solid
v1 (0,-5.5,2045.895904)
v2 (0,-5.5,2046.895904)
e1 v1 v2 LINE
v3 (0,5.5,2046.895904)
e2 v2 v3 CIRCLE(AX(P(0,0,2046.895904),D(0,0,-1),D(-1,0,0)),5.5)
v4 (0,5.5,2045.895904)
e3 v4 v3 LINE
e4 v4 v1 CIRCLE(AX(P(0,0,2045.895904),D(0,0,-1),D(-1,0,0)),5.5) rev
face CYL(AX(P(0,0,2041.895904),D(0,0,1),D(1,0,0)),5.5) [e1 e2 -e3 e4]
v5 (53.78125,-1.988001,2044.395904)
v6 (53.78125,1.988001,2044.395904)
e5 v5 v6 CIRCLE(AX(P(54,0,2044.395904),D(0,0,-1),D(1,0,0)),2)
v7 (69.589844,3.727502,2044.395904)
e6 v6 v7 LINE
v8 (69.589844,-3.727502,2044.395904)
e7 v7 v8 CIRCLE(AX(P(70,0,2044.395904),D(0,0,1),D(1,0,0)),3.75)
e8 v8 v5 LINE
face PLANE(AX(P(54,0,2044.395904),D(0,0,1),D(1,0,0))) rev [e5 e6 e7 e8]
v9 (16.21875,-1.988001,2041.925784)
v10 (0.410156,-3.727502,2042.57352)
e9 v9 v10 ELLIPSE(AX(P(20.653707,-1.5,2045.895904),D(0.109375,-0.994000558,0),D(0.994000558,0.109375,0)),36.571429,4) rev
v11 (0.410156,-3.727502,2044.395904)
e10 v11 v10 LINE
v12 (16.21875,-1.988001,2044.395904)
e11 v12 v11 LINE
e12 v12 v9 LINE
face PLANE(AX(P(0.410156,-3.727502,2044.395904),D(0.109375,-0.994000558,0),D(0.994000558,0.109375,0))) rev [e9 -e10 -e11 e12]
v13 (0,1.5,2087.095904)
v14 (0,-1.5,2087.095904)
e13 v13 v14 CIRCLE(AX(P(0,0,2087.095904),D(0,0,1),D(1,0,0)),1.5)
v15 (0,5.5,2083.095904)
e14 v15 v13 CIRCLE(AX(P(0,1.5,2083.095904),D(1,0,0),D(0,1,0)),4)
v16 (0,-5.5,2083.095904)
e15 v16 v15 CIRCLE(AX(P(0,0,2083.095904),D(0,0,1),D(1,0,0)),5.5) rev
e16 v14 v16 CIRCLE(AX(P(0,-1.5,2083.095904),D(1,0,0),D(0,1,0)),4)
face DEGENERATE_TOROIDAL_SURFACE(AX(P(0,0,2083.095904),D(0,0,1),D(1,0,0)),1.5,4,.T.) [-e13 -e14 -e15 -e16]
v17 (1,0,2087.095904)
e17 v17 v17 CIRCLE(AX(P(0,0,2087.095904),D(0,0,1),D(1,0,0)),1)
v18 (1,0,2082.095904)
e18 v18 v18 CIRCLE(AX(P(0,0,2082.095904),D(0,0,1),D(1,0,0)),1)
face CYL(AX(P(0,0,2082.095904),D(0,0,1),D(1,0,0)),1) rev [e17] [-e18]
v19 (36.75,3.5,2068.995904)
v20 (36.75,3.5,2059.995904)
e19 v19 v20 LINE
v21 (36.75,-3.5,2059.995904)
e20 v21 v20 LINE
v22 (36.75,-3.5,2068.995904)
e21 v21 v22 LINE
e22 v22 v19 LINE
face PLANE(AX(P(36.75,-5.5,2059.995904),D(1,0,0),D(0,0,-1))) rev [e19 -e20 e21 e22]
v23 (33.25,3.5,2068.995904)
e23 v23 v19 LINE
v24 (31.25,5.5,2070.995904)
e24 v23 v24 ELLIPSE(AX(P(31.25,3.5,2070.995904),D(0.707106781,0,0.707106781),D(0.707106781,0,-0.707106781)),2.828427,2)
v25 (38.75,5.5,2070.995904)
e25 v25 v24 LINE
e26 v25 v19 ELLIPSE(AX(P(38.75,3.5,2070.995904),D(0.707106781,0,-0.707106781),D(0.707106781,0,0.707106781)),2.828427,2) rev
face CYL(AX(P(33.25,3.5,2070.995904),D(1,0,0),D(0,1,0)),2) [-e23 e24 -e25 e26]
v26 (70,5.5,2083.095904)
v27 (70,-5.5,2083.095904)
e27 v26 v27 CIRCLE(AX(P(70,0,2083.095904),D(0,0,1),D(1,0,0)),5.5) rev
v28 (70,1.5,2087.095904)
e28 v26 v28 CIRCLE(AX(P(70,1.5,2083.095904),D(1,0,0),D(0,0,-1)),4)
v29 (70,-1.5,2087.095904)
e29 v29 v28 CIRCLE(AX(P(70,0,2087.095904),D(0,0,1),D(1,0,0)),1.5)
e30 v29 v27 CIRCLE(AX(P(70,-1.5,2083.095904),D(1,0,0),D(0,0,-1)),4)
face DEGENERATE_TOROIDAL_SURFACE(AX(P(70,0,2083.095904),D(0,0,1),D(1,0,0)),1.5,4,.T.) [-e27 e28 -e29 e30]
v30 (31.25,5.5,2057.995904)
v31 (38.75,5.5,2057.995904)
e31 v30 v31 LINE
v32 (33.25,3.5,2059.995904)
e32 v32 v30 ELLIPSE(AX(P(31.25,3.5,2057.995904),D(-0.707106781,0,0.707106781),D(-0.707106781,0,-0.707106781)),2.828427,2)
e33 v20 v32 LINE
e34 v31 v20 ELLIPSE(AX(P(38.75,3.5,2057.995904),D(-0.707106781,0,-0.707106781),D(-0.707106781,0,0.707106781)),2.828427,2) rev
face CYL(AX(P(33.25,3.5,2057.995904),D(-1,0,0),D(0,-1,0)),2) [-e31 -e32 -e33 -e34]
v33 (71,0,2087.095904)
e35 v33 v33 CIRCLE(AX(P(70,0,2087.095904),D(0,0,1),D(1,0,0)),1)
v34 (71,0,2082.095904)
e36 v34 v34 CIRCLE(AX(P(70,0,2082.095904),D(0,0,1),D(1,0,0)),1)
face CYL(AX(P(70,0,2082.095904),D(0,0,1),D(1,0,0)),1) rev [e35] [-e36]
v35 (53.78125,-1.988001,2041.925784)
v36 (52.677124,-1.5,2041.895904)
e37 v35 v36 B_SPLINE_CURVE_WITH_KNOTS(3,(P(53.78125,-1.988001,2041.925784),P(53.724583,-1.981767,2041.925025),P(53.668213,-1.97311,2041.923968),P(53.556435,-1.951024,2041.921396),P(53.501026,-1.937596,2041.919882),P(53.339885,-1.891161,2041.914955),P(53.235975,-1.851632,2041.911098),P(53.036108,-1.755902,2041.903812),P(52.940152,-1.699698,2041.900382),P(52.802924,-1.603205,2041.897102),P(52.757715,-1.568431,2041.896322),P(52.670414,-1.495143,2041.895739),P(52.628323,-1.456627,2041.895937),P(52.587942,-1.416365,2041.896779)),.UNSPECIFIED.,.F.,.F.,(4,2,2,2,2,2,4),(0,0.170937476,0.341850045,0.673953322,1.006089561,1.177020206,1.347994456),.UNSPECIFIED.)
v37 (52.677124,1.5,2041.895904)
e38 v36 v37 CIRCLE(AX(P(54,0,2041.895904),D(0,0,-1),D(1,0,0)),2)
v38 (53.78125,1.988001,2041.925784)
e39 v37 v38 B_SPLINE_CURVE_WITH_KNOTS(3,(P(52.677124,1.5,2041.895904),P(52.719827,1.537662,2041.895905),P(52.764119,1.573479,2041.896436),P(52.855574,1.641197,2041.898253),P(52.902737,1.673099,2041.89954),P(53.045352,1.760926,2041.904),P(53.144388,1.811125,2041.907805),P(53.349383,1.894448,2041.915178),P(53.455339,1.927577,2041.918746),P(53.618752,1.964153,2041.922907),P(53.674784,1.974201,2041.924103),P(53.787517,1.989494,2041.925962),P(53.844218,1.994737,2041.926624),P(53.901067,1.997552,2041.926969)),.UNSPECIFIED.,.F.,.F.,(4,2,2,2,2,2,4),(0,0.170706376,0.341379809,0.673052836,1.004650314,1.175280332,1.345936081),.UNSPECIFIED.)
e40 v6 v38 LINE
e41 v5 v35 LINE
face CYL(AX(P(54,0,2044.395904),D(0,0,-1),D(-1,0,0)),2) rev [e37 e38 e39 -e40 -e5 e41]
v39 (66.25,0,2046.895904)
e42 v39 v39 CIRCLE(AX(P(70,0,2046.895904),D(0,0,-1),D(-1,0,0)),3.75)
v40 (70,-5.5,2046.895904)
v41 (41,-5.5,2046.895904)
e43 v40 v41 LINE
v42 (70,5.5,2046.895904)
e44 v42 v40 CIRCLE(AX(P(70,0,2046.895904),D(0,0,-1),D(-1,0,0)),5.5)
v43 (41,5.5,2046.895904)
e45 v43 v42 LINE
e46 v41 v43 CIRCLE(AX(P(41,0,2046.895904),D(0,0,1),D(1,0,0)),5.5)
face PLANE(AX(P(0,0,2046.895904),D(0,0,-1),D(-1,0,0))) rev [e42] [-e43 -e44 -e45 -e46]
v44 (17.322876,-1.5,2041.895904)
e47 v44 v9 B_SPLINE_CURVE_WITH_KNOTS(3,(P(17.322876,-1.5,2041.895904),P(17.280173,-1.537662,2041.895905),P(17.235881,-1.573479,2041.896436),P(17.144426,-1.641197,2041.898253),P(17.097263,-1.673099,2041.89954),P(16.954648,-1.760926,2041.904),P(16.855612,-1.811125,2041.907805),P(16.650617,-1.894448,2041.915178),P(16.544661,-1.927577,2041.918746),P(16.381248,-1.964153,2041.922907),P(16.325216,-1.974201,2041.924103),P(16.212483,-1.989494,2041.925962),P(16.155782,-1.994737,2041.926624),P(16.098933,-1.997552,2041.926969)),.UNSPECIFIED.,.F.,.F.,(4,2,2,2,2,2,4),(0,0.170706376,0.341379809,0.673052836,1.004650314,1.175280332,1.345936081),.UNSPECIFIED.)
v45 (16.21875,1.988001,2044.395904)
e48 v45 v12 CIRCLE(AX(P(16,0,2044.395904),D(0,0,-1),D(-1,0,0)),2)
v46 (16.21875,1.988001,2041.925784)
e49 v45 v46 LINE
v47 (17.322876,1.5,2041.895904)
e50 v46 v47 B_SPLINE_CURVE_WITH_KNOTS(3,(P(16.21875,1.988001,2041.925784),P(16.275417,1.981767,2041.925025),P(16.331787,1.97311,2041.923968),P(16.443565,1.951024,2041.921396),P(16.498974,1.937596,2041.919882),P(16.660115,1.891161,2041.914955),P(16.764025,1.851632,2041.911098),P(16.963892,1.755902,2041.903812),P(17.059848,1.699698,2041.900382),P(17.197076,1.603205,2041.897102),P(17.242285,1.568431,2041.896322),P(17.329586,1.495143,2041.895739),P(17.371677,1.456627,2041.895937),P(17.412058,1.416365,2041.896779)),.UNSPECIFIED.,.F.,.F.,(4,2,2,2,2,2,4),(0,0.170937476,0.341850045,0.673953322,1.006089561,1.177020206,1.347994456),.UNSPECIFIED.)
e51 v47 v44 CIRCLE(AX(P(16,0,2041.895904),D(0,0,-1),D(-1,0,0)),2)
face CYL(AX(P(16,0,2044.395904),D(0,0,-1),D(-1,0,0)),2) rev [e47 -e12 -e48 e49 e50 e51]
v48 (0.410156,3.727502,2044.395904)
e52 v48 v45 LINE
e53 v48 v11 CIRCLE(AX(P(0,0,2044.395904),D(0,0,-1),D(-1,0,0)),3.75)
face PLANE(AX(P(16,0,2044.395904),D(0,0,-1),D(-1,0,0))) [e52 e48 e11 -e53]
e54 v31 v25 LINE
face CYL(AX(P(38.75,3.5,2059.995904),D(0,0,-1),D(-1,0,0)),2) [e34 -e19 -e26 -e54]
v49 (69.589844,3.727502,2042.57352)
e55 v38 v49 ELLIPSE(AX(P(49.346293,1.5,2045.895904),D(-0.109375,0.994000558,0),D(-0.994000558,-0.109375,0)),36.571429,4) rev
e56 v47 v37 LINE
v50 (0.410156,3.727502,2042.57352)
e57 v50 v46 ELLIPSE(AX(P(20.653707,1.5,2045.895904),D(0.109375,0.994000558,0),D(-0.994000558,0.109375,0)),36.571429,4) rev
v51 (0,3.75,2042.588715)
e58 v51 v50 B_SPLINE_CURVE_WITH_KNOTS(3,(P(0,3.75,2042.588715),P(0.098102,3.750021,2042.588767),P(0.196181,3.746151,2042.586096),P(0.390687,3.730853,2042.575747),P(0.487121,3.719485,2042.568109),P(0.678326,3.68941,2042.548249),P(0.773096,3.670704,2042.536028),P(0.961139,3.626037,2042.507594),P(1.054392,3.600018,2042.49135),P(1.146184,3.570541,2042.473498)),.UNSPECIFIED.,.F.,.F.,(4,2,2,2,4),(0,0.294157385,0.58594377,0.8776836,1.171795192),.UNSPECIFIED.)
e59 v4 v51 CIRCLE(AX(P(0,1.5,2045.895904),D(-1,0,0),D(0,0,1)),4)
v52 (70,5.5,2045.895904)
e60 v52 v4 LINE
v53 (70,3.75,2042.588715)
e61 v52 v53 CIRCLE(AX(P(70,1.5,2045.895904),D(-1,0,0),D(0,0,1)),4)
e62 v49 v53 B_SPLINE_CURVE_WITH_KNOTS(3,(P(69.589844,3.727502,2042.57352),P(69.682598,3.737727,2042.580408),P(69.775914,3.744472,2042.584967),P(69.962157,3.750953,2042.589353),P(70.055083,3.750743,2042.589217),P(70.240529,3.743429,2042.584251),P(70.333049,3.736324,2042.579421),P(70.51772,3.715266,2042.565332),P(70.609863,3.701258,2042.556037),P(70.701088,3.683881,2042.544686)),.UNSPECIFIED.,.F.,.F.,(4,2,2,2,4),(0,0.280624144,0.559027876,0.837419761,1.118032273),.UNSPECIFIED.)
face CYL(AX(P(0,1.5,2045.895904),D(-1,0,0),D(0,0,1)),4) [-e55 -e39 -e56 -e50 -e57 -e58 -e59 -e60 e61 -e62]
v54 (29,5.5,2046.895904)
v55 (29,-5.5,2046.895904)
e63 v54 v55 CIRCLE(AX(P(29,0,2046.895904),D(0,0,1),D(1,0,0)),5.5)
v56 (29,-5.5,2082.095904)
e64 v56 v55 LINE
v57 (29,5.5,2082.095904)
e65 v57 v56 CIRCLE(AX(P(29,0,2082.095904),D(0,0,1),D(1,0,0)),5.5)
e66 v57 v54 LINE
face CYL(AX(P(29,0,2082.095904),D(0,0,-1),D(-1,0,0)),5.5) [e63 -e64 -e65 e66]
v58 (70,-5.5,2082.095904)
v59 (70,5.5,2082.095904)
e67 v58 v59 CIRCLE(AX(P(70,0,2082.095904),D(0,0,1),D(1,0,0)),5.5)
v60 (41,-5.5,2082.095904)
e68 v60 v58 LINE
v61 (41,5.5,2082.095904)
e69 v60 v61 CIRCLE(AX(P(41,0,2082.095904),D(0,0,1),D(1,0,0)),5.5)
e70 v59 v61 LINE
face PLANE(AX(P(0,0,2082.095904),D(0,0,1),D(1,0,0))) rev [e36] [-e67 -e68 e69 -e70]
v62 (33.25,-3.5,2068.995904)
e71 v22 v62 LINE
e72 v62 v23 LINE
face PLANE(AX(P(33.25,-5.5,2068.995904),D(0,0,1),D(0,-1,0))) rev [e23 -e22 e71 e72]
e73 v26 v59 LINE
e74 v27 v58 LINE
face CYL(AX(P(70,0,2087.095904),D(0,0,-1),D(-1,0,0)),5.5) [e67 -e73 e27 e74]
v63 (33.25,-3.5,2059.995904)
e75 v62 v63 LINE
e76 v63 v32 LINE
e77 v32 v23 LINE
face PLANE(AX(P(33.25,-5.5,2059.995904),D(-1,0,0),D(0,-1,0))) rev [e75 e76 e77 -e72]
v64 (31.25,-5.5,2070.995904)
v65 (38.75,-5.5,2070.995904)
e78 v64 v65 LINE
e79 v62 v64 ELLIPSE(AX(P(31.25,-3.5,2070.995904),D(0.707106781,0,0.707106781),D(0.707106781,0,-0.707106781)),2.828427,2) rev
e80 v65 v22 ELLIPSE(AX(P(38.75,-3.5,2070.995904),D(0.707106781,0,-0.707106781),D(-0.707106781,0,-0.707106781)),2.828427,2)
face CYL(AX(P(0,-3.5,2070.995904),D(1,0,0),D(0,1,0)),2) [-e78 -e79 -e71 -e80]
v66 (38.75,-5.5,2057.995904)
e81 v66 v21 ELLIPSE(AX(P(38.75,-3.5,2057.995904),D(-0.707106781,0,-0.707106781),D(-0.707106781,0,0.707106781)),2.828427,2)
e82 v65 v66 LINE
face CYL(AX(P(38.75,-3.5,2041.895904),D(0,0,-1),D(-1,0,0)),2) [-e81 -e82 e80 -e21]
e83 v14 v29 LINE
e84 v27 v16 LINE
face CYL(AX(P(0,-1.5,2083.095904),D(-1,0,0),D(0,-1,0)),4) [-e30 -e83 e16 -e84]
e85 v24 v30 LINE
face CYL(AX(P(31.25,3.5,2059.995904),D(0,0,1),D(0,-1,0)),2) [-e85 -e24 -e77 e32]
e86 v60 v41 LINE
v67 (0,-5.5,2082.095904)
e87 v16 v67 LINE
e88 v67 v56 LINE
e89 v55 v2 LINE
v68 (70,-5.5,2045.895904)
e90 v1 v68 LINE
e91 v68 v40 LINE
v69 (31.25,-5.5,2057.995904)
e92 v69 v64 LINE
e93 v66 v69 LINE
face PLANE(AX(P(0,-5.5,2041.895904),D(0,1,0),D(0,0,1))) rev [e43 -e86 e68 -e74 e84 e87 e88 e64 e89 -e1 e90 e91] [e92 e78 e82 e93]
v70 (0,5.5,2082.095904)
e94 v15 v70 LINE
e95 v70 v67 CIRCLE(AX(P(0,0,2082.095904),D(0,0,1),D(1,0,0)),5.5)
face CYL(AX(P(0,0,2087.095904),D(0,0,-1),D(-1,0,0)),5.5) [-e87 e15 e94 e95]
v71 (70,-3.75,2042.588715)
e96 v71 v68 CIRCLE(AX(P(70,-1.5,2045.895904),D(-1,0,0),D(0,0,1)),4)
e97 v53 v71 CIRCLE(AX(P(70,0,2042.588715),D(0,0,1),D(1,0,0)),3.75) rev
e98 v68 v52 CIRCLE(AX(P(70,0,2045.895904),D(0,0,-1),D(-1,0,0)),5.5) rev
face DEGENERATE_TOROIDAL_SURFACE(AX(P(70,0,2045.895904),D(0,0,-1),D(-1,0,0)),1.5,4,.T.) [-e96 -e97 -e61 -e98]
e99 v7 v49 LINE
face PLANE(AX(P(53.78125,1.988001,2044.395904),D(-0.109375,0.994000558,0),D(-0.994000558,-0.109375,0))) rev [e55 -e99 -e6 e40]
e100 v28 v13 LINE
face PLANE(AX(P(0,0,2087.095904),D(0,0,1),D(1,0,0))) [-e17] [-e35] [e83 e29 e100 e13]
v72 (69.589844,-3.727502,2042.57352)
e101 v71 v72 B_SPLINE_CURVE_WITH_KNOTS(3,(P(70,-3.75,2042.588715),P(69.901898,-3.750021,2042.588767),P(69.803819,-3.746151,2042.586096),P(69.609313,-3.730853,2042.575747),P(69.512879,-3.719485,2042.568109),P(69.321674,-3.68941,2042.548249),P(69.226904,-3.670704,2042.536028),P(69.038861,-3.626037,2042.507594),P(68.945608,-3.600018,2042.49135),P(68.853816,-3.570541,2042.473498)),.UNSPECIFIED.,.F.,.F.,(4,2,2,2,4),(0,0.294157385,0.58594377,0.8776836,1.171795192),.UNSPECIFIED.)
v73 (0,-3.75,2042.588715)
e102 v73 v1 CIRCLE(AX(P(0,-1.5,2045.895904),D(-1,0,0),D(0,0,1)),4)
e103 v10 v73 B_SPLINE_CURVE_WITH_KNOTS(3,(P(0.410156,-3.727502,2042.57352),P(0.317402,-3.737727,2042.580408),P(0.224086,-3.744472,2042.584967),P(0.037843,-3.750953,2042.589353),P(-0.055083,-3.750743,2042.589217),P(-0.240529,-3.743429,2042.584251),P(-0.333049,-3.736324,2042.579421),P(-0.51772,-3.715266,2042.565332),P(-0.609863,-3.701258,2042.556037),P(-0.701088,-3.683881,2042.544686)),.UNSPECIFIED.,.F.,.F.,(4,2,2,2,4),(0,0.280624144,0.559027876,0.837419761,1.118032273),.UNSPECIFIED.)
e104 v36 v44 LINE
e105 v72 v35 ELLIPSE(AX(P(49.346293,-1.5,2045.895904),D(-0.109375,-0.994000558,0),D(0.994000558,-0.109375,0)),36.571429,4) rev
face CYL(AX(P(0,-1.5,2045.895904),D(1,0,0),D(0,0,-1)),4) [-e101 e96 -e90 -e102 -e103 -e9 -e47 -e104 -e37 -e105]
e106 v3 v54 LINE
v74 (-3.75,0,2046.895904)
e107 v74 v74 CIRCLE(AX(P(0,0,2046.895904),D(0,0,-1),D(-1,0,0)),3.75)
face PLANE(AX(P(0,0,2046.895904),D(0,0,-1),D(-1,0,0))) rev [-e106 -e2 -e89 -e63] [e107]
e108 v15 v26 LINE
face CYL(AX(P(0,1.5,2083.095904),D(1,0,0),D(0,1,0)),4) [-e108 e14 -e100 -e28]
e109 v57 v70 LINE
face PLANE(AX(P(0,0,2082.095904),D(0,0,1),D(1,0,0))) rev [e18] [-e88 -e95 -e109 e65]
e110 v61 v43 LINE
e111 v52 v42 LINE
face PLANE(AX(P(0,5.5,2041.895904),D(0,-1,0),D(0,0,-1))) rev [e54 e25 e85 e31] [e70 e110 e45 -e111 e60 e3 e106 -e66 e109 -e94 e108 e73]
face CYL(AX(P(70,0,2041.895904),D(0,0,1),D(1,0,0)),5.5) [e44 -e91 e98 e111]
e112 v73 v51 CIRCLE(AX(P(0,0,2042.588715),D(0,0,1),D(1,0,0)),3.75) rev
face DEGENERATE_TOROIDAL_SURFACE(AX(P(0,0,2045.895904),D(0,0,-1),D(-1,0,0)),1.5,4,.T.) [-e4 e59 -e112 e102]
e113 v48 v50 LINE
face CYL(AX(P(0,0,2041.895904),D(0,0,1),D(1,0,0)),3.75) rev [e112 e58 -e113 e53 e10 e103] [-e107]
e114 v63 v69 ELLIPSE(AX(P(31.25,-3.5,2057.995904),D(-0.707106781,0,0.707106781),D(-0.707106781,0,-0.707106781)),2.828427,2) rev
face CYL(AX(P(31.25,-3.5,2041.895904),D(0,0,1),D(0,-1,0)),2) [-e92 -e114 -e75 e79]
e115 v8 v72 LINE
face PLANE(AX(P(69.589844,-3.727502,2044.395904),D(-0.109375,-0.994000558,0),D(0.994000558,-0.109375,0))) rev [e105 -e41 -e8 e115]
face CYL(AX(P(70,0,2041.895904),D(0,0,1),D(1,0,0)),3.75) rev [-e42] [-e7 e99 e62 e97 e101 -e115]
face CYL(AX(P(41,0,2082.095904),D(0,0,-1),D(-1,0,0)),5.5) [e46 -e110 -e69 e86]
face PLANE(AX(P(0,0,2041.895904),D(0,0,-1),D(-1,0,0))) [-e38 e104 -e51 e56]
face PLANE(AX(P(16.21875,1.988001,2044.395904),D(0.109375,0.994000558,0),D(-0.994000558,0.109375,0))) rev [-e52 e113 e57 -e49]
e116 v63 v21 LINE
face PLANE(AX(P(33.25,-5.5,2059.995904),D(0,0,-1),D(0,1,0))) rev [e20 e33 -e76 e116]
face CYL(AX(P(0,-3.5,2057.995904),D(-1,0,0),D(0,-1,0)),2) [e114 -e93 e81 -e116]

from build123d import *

# Parameters (mm, degrees)
BOSS_EXTRU_1_DEPTH      = 1
BOSS_EXTRU_1_DEPTH_BACK = 4
ESQUISSE1_R             = 3.75
ENL_V_MAT_EXTRU_1_DEPTH = 2.5
BOSS_EXTRU_2_DEPTH      = 35.2
BOSS_EXTRU_3_START      = 5
BOSS_EXTRU_3_DEPTH      = 5
ESQUISSE5_R             = 1
ENL_V_MAT_EXTRU_2_DEPTH = 5
CONG_1_R                = 4
ESQUISSE6_W             = 3.5
ESQUISSE6_H             = 9
ENL_V_MAT_EXTRU_3_DEPTH = 2089.490019804
CONG_2_R                = 2


with BuildPart() as part:
    # Esquisse1 → Boss.-Extru.1 (new, two sides: drawn at the far end of the back side and taken through both)
    with BuildSketch(Plane(origin=(0, 0, 2042.895904074), x_dir=(-1, 0, 0), z_dir=(0, 0, -1)).offset(-BOSS_EXTRU_1_DEPTH_BACK)):
        with BuildLine():
            Line((0, -5.5), (-70, -5.5))
            ThreePointArc((-70, -5.5), (-75.5, 0), (-70, 5.5))
            Line((-70, 5.5), (0, 5.5))
            ThreePointArc((0, 5.5), (5.5, 0), (0, -5.5))
        make_face()
        Circle(ESQUISSE1_R, mode=Mode.SUBTRACT)
        with Locations((-70, 0)):
            Circle(ESQUISSE1_R, mode=Mode.SUBTRACT)
    extrude(amount=BOSS_EXTRU_1_DEPTH + BOSS_EXTRU_1_DEPTH_BACK)

    # Esquisse2 → Enlèv. mat.-Extru.1 (cut)
    with BuildSketch(Plane(origin=(0, 0, 2041.895904074), x_dir=(-1, 0, 0), z_dir=(0, 0, -1))):
        with BuildLine():
            Line((-0.41015625, -3.727502093), (-16.21875, -1.988001116))
            ThreePointArc((-16.21875, -1.988001116), (-18, 0), (-16.21875, 1.988001116))
            Line((-16.21875, 1.988001116), (-0.41015625, 3.727502093))
            Line((-0.41015625, 3.727502093), (-0.41015625, -3.727502093))
        make_face()
        with BuildLine():
            Line((-53.78125, 1.988001116), (-69.58984375, 3.727502093))
            Line((-69.58984375, 3.727502093), (-69.58984375, -3.727502093))
            Line((-69.58984375, -3.727502093), (-53.78125, -1.988001116))
            ThreePointArc((-53.78125, -1.988001116), (-52, 0), (-53.78125, 1.988001116))
        make_face()
    extrude(amount=-ENL_V_MAT_EXTRU_1_DEPTH, mode=Mode.SUBTRACT)

    # Esquisse3 → Boss.-Extru.2 (add)
    with BuildSketch(Plane.XY.offset(2046.895904074)):
        with BuildLine():
            Line((29, 5.5), (41, 5.5))
            ThreePointArc((41, 5.5), (46.5, 0), (41, -5.5))
            Line((41, -5.5), (29, -5.5))
            ThreePointArc((29, -5.5), (23.5, 0), (29, 5.5))
        make_face()
    extrude(amount=BOSS_EXTRU_2_DEPTH)

    # Esquisse4 → Boss.-Extru.3 (add)
    with BuildSketch(Plane.XY.offset(2082.095904074).offset(BOSS_EXTRU_3_START)):
        with BuildLine():
            Line((0, 5.5), (70, 5.5))
            ThreePointArc((70, 5.5), (75.5, 0), (70, -5.5))
            Line((70, -5.5), (0, -5.5))
            ThreePointArc((0, -5.5), (-5.5, 0), (0, 5.5))
        make_face()
    extrude(amount=-BOSS_EXTRU_3_DEPTH)

    # Esquisse5 → Enlèv. mat.-Extru.2 (cut)
    with BuildSketch(Plane.XY.offset(2087.095904074)):
        Circle(ESQUISSE5_R)
        with Locations((70, 0)):
            Circle(ESQUISSE5_R)
    extrude(amount=-ENL_V_MAT_EXTRU_2_DEPTH, mode=Mode.SUBTRACT)

    # Congé1
    # the kernel refuses this fillet: 4 mm, written as the material it takes off along each edge
    with BuildSketch(Plane(origin=(70, 5.5, 2041.895904074), x_dir=(0, 0, 1), z_dir=(-1, 0, 0)), Plane(origin=(0, -5.5, 2041.895904074), x_dir=(0, 0, 1), z_dir=(1, 0, 0)), Plane(origin=(70, -5.5, 2087.095904074), x_dir=(0, 0, -1), z_dir=(-1, 0, 0)), Plane(origin=(0, 5.5, 2087.095904074), x_dir=(0, 0, -1), z_dir=(1, 0, 0))) as cong_1_piece_1:
        with BuildLine():
            CenterArc((CONG_1_R, -CONG_1_R), CONG_1_R, 90, 90)
            Line((0, -CONG_1_R), (0, 0))
            Line((0, 0), (CONG_1_R, 0))
        make_face()
    extrude(amount=70, mode=Mode.SUBTRACT)
    with BuildSketch(Plane(origin=(70, 0, 2087.095904074), x_dir=(0, 1, 0), z_dir=(-1, 0, 0))) as cong_1_piece_2:
        with BuildLine():
            CenterArc((5.5 - CONG_1_R, CONG_1_R), CONG_1_R, 270, 90)
            Line((5.5, CONG_1_R), (5.5, 0))
            Line((5.5, 0), (5.5 - CONG_1_R, 0))
        make_face()
    revolve(axis=Axis((70, 0, 2087.095904074), (0, 0, -1)), revolution_arc=180, mode=Mode.SUBTRACT)
    with BuildSketch(Plane(origin=(0, 0, 2087.095904074), x_dir=(0, -1, 0), z_dir=(1, 0, 0))) as cong_1_piece_3:
        with BuildLine():
            CenterArc((5.5 - CONG_1_R, CONG_1_R), CONG_1_R, 270, 90)
            Line((5.5 - CONG_1_R, 0), (5.5, 0))
            Line((5.5, 0), (5.5, CONG_1_R))
        make_face()
    revolve(axis=Axis((0, 0, 2087.095904074), (0, 0, -1)), revolution_arc=180, mode=Mode.SUBTRACT)
    with BuildSketch(Plane(origin=(0, 0, 2041.895904074), x_dir=(0, 1, 0), z_dir=(1, 0, 0))) as cong_1_piece_4:
        with BuildLine():
            CenterArc((5.5 - CONG_1_R, CONG_1_R), CONG_1_R, 270, 90)
            Line((5.5, CONG_1_R), (5.5, 0))
            Line((5.5, 0), (5.5 - CONG_1_R, 0))
        make_face()
    revolve(axis=Axis((0, 0, 2041.895904074), (0, 0, 1)), revolution_arc=180, mode=Mode.SUBTRACT)
    with BuildSketch(Plane(origin=(70, 0, 2041.895904074), x_dir=(0, -1, 0), z_dir=(-1, 0, 0))) as cong_1_piece_5:
        with BuildLine():
            CenterArc((5.5 - CONG_1_R, CONG_1_R), CONG_1_R, 270, 90)
            Line((5.5 - CONG_1_R, 0), (5.5, 0))
            Line((5.5, 0), (5.5, CONG_1_R))
        make_face()
    revolve(axis=Axis((70, 0, 2041.895904074), (0, 0, 1)), revolution_arc=180, mode=Mode.SUBTRACT)

    # Esquisse6 → Enlèv. mat.-Extru.3 (cut, through all)
    with BuildSketch(Plane(origin=(0, 5.5, 0), x_dir=(1, 0, 0), z_dir=(0, 1, 0))):
        with Locations((35, -2064.495904074)):
            Rectangle(ESQUISSE6_W, ESQUISSE6_H)
    extrude(amount=-ENL_V_MAT_EXTRU_3_DEPTH, mode=Mode.SUBTRACT)

    # Congé2
    cong_2_edges = [part.edges().sort_by_distance(p)[0] for p in [
        (36.75, -5.5, 2064.495904074),
        (35, -5.5, 2068.995904074),
        (33.25, -5.5, 2064.495904074),
        (35, -5.5, 2059.995904074),
        (36.75, 5.5, 2064.495904074),
        (35, 5.5, 2059.995904074),
        (33.25, 5.5, 2064.495904074),
        (35, 5.5, 2068.995904074),
    ]]
    fillet(cong_2_edges, radius=CONG_2_R)


solid = part.part
